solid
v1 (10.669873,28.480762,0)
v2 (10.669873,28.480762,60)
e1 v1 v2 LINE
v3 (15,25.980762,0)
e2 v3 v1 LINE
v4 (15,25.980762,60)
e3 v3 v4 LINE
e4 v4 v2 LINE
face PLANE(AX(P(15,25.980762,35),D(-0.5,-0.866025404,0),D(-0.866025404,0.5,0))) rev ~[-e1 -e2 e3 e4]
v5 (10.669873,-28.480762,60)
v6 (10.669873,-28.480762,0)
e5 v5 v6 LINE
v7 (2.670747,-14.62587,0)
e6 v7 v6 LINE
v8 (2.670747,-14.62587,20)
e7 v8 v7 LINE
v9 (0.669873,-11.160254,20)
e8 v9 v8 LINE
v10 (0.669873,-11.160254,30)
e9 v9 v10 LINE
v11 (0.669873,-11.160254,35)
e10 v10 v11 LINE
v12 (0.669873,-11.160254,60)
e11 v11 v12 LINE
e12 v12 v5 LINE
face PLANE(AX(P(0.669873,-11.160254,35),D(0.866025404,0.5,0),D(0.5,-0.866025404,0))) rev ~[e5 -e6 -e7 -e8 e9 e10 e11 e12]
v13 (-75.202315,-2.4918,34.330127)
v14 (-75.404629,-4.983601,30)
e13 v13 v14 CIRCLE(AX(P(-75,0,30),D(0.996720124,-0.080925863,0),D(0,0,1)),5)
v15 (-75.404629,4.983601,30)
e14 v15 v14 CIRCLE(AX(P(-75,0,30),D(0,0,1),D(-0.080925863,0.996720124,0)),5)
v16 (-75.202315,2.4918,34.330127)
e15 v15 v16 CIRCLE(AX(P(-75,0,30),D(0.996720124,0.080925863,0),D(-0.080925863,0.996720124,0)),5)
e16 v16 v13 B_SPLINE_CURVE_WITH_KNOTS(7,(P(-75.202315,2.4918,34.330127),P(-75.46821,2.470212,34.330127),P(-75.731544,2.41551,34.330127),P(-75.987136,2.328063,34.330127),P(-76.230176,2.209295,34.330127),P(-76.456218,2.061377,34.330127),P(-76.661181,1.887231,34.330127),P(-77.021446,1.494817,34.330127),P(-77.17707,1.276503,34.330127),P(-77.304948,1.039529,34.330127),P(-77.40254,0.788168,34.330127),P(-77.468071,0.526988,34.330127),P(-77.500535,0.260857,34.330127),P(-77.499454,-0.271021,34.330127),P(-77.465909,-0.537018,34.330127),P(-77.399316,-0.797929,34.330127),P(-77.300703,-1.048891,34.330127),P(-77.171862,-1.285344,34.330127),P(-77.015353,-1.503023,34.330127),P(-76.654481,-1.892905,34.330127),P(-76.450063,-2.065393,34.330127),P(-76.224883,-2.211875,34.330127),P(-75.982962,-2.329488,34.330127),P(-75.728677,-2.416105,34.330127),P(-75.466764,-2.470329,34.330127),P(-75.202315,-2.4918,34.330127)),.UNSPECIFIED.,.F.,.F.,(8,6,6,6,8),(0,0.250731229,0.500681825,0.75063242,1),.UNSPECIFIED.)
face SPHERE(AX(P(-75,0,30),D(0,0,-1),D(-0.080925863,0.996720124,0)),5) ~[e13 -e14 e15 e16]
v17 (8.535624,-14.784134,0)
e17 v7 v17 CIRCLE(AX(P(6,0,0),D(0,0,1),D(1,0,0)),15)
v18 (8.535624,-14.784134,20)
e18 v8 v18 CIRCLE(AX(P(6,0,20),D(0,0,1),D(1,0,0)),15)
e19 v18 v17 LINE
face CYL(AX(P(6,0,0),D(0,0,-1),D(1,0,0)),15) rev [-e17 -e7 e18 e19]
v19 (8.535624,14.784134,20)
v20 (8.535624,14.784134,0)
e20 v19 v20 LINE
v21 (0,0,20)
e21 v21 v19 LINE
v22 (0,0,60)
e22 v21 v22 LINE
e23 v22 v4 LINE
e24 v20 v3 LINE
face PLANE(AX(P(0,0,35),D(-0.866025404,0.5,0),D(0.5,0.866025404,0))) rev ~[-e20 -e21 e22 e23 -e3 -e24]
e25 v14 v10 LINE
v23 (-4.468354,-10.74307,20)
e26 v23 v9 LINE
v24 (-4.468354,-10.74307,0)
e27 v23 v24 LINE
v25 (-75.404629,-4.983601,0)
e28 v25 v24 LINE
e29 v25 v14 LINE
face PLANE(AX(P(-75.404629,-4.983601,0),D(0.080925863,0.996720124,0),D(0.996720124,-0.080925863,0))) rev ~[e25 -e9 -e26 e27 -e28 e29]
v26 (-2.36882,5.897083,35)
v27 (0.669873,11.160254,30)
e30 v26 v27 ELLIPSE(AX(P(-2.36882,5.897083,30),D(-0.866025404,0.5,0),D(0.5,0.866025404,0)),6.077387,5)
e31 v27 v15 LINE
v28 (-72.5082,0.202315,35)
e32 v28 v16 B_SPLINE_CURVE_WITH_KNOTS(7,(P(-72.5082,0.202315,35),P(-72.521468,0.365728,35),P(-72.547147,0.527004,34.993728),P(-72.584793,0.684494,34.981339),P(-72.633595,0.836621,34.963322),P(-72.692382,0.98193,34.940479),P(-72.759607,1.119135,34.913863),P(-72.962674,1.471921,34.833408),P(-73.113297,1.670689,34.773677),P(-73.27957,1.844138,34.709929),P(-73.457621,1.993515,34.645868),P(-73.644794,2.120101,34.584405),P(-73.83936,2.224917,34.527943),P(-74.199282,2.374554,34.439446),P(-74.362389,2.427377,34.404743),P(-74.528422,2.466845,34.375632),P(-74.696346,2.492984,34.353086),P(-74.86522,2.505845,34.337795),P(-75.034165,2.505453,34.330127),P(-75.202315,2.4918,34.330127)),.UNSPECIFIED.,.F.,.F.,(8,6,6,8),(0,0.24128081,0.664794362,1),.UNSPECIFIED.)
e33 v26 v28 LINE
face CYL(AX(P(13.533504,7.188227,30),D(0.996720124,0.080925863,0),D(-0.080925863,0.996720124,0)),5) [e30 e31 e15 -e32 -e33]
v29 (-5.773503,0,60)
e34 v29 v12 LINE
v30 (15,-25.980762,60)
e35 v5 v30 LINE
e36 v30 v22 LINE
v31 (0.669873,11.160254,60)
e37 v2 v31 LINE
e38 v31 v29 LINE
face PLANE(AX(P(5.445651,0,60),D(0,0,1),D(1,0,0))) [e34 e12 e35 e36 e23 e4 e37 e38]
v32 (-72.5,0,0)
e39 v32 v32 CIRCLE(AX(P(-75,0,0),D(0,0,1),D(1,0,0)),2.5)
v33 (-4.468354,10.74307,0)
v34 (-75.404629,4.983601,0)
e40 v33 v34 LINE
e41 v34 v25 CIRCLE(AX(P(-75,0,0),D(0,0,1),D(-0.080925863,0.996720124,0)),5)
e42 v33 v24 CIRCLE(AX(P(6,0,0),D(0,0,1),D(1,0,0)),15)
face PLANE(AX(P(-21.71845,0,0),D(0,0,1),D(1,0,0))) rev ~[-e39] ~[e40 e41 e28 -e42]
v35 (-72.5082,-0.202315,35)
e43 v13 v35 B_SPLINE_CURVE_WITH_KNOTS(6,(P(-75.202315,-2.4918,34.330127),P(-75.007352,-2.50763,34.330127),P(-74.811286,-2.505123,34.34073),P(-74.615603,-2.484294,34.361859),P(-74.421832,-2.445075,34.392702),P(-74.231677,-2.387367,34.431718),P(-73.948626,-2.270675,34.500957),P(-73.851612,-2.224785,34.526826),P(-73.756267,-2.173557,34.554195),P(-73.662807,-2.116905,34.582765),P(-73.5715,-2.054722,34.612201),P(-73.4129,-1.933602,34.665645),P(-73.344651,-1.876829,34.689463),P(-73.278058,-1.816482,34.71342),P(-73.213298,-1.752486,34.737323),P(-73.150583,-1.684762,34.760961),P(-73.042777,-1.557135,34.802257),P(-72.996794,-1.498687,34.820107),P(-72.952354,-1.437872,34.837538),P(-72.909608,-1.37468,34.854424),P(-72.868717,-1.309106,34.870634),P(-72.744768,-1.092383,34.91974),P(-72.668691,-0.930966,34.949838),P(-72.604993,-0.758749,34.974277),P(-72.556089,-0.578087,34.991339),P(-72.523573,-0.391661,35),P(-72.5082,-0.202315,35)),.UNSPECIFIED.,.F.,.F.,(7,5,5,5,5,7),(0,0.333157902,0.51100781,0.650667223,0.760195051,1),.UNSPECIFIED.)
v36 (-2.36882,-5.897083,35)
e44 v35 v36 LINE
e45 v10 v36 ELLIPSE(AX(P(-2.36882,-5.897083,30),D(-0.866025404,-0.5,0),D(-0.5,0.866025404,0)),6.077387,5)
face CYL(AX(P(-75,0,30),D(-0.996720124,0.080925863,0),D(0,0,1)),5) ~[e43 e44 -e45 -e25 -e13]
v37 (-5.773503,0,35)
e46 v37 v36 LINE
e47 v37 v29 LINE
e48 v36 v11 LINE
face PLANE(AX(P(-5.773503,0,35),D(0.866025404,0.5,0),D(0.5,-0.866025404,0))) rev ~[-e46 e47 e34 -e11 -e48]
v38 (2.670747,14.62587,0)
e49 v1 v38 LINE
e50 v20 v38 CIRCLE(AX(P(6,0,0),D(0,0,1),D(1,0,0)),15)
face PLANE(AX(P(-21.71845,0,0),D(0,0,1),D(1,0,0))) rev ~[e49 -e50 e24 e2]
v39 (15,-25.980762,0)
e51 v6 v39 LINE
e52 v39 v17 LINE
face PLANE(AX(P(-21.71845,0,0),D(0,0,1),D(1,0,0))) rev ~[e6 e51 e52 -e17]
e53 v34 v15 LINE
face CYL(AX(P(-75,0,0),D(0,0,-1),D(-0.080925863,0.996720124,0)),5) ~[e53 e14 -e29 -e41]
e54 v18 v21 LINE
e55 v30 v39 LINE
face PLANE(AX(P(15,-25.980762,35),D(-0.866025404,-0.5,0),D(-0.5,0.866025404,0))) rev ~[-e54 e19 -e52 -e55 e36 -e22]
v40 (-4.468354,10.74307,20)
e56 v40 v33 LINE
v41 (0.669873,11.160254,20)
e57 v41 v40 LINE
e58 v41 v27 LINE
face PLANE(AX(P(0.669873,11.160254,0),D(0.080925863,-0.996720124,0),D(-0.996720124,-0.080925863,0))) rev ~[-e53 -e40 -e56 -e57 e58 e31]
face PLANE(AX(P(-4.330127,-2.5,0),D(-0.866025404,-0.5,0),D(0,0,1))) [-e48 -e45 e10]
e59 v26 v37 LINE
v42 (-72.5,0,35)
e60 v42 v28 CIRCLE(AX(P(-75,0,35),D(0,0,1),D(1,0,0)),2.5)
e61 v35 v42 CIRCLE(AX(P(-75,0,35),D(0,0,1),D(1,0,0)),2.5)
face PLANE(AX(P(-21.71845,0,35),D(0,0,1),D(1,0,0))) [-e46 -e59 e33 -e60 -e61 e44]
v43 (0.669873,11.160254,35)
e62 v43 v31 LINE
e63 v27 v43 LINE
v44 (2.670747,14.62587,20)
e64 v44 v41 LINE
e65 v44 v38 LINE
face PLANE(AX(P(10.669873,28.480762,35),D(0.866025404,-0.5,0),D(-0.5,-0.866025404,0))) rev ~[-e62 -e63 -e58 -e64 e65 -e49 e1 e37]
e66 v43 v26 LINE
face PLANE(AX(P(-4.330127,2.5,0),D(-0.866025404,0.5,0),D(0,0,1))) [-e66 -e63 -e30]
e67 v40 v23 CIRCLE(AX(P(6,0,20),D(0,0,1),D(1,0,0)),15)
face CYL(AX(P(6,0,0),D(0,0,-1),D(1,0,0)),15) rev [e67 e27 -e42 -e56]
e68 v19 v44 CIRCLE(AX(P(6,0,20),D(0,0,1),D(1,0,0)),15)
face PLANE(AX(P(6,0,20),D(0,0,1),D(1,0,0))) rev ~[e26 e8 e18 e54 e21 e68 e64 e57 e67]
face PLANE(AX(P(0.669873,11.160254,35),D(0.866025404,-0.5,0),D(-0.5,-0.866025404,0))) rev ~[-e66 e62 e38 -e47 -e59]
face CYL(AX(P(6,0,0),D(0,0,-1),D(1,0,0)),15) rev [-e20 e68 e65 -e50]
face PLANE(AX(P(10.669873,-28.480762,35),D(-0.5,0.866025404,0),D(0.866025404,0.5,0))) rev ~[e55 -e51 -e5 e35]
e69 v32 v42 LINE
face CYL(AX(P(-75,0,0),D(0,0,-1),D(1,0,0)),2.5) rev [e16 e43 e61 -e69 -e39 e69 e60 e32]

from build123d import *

# Parameters (mm, degrees)
F0_R         = 2.5
F1_DEPTH     = 35
F3_DEPTH     = 25
F4_T4_DEPTH  = 88.824838337
F4_T9_DEPTH  = 88.824838337
F4_T12_ANGLE = 170.716427301
F5_R         = 15
F6_DEPTH     = 20


# Not quite as in the source:
# - a fillet or chamfer that OpenCascade refuses, or shapes differently, is made with other operations: its cross-section is extruded or revolved along the edge and cut away or added


with BuildPart() as f1:
    # F0 (on Top) → F1 (new body)
    with BuildSketch(Plane.XY):
        with BuildLine():
            Line((0.6698729811, 11.1602540378), (-75.4046293156, 4.9836006177))
            ThreePointArc((-75.4046293156, 4.9836006177), (-80, 0), (-75.4046293156, -4.9836006177))
            Line((-75.4046293156, -4.9836006177), (0.6698729811, -11.1602540378))
            Line((0.6698729811, -11.1602540378), (10.6698729811, -28.4807621135))
            Line((10.6698729811, -28.4807621135), (15, -25.9807621135))
            Line((15, -25.9807621135), (0, 0))
            Line((0, 0), (15, 25.9807621135))
            Line((15, 25.9807621135), (10.6698729811, 28.4807621135))
            Line((10.6698729811, 28.4807621135), (0.6698729811, 11.1602540378))
        make_face()
        with Locations((-75, 0)):
            Circle(F0_R, mode=Mode.SUBTRACT)
    extrude(amount=F1_DEPTH)

    # F2 (on face) → F3 (join)
    with BuildSketch(Plane.XY.offset(35)):
        Polygon((15, -25.9807621135), (0, 0), (15, 25.9807621135), (10.6698729811, 28.4807621135), (0.6698729811, 11.1602540378), (-5.7735026919, 0), (0.6698729811, -11.1602540378), (10.6698729811, -28.4807621135), align=None)
    extrude(amount=F3_DEPTH)

    # F4: fillet of radius 5 on 2 edges, made by hand


with BuildPart() as f4_tool2:
    # F4_s3 → F4_t4 (new body)
    with BuildSketch(Plane(origin=(-74.5088253508, 6.0495327217, 0), x_dir=(0, 0, 1), z_dir=(0.9967201235, -0.0809258631, 0))):
        with BuildLine():
            ThreePointArc((35, 6.0694397342), (33.5355339059, 9.6049736401), (30, 11.0694397342))
            Line((30, 11.0694397342), (35, 11.0694397342))
            Line((35, 11.0694397342), (35, 6.0694397342))
        make_face()
    extrude(amount=F4_T4_DEPTH)

    split(bisect_by=Plane(origin=(-4.3301270189, -2.5, 0), x_dir=(0, 0, 1), z_dir=(-0.8660254038, -0.5, 0)), keep=Keep.TOP)


with BuildPart() as f1_1:
    add(f1.part)

    # F4_t1: cut F4_tool2
    add(f4_tool2.part, mode=Mode.SUBTRACT)


with BuildPart() as f4_tool7:
    # F4_s8 → F4_t9 (new body)
    with BuildSketch(Plane(origin=(14.0246784902, 1.1386939874, 0), x_dir=(0, 0, 1), z_dir=(-0.9967201235, -0.0809258631, 0))):
        with BuildLine():
            ThreePointArc((30, 11.0694397342), (33.5355339059, 9.6049736401), (35, 6.0694397342))
            Line((35, 6.0694397342), (35, 11.0694397342))
            Line((35, 11.0694397342), (30, 11.0694397342))
        make_face()
    extrude(amount=F4_T9_DEPTH)

    split(bisect_by=Plane(origin=(-4.3301270189, 2.5, 0), x_dir=(0, 0, 1), z_dir=(-0.8660254038, 0.5, 0)), keep=Keep.TOP)


with BuildPart() as f1_2:
    add(f1_1.part)

    # F4_t6: cut F4_tool7
    add(f4_tool7.part, mode=Mode.SUBTRACT)

    # F4_s11 → F4_t12 (revolve, cut)
    with BuildSketch(Plane(origin=(-74.5088253508, -6.0495327217, 0), x_dir=(0, 0, 1), z_dir=(0.9967201235, 0.0809258631, 0))):
        with BuildLine():
            ThreePointArc((35, -6.0694397342), (33.5355339059, -9.6049736401), (30, -11.0694397342))
            Line((30, -11.0694397342), (35, -11.0694397342))
            Line((35, -11.0694397342), (35, -6.0694397342))
        make_face()
    revolve(axis=Axis((-75, 0, 35), (0, 0, 1)), revolution_arc=F4_T12_ANGLE, mode=Mode.SUBTRACT)

    # F5 (on Top) → F6 (cut)
    with BuildSketch(Plane.XY):
        with Locations((6, 0)):
            Circle(F5_R)
    extrude(amount=F6_DEPTH, mode=Mode.SUBTRACT)


solid = f1_2.part
